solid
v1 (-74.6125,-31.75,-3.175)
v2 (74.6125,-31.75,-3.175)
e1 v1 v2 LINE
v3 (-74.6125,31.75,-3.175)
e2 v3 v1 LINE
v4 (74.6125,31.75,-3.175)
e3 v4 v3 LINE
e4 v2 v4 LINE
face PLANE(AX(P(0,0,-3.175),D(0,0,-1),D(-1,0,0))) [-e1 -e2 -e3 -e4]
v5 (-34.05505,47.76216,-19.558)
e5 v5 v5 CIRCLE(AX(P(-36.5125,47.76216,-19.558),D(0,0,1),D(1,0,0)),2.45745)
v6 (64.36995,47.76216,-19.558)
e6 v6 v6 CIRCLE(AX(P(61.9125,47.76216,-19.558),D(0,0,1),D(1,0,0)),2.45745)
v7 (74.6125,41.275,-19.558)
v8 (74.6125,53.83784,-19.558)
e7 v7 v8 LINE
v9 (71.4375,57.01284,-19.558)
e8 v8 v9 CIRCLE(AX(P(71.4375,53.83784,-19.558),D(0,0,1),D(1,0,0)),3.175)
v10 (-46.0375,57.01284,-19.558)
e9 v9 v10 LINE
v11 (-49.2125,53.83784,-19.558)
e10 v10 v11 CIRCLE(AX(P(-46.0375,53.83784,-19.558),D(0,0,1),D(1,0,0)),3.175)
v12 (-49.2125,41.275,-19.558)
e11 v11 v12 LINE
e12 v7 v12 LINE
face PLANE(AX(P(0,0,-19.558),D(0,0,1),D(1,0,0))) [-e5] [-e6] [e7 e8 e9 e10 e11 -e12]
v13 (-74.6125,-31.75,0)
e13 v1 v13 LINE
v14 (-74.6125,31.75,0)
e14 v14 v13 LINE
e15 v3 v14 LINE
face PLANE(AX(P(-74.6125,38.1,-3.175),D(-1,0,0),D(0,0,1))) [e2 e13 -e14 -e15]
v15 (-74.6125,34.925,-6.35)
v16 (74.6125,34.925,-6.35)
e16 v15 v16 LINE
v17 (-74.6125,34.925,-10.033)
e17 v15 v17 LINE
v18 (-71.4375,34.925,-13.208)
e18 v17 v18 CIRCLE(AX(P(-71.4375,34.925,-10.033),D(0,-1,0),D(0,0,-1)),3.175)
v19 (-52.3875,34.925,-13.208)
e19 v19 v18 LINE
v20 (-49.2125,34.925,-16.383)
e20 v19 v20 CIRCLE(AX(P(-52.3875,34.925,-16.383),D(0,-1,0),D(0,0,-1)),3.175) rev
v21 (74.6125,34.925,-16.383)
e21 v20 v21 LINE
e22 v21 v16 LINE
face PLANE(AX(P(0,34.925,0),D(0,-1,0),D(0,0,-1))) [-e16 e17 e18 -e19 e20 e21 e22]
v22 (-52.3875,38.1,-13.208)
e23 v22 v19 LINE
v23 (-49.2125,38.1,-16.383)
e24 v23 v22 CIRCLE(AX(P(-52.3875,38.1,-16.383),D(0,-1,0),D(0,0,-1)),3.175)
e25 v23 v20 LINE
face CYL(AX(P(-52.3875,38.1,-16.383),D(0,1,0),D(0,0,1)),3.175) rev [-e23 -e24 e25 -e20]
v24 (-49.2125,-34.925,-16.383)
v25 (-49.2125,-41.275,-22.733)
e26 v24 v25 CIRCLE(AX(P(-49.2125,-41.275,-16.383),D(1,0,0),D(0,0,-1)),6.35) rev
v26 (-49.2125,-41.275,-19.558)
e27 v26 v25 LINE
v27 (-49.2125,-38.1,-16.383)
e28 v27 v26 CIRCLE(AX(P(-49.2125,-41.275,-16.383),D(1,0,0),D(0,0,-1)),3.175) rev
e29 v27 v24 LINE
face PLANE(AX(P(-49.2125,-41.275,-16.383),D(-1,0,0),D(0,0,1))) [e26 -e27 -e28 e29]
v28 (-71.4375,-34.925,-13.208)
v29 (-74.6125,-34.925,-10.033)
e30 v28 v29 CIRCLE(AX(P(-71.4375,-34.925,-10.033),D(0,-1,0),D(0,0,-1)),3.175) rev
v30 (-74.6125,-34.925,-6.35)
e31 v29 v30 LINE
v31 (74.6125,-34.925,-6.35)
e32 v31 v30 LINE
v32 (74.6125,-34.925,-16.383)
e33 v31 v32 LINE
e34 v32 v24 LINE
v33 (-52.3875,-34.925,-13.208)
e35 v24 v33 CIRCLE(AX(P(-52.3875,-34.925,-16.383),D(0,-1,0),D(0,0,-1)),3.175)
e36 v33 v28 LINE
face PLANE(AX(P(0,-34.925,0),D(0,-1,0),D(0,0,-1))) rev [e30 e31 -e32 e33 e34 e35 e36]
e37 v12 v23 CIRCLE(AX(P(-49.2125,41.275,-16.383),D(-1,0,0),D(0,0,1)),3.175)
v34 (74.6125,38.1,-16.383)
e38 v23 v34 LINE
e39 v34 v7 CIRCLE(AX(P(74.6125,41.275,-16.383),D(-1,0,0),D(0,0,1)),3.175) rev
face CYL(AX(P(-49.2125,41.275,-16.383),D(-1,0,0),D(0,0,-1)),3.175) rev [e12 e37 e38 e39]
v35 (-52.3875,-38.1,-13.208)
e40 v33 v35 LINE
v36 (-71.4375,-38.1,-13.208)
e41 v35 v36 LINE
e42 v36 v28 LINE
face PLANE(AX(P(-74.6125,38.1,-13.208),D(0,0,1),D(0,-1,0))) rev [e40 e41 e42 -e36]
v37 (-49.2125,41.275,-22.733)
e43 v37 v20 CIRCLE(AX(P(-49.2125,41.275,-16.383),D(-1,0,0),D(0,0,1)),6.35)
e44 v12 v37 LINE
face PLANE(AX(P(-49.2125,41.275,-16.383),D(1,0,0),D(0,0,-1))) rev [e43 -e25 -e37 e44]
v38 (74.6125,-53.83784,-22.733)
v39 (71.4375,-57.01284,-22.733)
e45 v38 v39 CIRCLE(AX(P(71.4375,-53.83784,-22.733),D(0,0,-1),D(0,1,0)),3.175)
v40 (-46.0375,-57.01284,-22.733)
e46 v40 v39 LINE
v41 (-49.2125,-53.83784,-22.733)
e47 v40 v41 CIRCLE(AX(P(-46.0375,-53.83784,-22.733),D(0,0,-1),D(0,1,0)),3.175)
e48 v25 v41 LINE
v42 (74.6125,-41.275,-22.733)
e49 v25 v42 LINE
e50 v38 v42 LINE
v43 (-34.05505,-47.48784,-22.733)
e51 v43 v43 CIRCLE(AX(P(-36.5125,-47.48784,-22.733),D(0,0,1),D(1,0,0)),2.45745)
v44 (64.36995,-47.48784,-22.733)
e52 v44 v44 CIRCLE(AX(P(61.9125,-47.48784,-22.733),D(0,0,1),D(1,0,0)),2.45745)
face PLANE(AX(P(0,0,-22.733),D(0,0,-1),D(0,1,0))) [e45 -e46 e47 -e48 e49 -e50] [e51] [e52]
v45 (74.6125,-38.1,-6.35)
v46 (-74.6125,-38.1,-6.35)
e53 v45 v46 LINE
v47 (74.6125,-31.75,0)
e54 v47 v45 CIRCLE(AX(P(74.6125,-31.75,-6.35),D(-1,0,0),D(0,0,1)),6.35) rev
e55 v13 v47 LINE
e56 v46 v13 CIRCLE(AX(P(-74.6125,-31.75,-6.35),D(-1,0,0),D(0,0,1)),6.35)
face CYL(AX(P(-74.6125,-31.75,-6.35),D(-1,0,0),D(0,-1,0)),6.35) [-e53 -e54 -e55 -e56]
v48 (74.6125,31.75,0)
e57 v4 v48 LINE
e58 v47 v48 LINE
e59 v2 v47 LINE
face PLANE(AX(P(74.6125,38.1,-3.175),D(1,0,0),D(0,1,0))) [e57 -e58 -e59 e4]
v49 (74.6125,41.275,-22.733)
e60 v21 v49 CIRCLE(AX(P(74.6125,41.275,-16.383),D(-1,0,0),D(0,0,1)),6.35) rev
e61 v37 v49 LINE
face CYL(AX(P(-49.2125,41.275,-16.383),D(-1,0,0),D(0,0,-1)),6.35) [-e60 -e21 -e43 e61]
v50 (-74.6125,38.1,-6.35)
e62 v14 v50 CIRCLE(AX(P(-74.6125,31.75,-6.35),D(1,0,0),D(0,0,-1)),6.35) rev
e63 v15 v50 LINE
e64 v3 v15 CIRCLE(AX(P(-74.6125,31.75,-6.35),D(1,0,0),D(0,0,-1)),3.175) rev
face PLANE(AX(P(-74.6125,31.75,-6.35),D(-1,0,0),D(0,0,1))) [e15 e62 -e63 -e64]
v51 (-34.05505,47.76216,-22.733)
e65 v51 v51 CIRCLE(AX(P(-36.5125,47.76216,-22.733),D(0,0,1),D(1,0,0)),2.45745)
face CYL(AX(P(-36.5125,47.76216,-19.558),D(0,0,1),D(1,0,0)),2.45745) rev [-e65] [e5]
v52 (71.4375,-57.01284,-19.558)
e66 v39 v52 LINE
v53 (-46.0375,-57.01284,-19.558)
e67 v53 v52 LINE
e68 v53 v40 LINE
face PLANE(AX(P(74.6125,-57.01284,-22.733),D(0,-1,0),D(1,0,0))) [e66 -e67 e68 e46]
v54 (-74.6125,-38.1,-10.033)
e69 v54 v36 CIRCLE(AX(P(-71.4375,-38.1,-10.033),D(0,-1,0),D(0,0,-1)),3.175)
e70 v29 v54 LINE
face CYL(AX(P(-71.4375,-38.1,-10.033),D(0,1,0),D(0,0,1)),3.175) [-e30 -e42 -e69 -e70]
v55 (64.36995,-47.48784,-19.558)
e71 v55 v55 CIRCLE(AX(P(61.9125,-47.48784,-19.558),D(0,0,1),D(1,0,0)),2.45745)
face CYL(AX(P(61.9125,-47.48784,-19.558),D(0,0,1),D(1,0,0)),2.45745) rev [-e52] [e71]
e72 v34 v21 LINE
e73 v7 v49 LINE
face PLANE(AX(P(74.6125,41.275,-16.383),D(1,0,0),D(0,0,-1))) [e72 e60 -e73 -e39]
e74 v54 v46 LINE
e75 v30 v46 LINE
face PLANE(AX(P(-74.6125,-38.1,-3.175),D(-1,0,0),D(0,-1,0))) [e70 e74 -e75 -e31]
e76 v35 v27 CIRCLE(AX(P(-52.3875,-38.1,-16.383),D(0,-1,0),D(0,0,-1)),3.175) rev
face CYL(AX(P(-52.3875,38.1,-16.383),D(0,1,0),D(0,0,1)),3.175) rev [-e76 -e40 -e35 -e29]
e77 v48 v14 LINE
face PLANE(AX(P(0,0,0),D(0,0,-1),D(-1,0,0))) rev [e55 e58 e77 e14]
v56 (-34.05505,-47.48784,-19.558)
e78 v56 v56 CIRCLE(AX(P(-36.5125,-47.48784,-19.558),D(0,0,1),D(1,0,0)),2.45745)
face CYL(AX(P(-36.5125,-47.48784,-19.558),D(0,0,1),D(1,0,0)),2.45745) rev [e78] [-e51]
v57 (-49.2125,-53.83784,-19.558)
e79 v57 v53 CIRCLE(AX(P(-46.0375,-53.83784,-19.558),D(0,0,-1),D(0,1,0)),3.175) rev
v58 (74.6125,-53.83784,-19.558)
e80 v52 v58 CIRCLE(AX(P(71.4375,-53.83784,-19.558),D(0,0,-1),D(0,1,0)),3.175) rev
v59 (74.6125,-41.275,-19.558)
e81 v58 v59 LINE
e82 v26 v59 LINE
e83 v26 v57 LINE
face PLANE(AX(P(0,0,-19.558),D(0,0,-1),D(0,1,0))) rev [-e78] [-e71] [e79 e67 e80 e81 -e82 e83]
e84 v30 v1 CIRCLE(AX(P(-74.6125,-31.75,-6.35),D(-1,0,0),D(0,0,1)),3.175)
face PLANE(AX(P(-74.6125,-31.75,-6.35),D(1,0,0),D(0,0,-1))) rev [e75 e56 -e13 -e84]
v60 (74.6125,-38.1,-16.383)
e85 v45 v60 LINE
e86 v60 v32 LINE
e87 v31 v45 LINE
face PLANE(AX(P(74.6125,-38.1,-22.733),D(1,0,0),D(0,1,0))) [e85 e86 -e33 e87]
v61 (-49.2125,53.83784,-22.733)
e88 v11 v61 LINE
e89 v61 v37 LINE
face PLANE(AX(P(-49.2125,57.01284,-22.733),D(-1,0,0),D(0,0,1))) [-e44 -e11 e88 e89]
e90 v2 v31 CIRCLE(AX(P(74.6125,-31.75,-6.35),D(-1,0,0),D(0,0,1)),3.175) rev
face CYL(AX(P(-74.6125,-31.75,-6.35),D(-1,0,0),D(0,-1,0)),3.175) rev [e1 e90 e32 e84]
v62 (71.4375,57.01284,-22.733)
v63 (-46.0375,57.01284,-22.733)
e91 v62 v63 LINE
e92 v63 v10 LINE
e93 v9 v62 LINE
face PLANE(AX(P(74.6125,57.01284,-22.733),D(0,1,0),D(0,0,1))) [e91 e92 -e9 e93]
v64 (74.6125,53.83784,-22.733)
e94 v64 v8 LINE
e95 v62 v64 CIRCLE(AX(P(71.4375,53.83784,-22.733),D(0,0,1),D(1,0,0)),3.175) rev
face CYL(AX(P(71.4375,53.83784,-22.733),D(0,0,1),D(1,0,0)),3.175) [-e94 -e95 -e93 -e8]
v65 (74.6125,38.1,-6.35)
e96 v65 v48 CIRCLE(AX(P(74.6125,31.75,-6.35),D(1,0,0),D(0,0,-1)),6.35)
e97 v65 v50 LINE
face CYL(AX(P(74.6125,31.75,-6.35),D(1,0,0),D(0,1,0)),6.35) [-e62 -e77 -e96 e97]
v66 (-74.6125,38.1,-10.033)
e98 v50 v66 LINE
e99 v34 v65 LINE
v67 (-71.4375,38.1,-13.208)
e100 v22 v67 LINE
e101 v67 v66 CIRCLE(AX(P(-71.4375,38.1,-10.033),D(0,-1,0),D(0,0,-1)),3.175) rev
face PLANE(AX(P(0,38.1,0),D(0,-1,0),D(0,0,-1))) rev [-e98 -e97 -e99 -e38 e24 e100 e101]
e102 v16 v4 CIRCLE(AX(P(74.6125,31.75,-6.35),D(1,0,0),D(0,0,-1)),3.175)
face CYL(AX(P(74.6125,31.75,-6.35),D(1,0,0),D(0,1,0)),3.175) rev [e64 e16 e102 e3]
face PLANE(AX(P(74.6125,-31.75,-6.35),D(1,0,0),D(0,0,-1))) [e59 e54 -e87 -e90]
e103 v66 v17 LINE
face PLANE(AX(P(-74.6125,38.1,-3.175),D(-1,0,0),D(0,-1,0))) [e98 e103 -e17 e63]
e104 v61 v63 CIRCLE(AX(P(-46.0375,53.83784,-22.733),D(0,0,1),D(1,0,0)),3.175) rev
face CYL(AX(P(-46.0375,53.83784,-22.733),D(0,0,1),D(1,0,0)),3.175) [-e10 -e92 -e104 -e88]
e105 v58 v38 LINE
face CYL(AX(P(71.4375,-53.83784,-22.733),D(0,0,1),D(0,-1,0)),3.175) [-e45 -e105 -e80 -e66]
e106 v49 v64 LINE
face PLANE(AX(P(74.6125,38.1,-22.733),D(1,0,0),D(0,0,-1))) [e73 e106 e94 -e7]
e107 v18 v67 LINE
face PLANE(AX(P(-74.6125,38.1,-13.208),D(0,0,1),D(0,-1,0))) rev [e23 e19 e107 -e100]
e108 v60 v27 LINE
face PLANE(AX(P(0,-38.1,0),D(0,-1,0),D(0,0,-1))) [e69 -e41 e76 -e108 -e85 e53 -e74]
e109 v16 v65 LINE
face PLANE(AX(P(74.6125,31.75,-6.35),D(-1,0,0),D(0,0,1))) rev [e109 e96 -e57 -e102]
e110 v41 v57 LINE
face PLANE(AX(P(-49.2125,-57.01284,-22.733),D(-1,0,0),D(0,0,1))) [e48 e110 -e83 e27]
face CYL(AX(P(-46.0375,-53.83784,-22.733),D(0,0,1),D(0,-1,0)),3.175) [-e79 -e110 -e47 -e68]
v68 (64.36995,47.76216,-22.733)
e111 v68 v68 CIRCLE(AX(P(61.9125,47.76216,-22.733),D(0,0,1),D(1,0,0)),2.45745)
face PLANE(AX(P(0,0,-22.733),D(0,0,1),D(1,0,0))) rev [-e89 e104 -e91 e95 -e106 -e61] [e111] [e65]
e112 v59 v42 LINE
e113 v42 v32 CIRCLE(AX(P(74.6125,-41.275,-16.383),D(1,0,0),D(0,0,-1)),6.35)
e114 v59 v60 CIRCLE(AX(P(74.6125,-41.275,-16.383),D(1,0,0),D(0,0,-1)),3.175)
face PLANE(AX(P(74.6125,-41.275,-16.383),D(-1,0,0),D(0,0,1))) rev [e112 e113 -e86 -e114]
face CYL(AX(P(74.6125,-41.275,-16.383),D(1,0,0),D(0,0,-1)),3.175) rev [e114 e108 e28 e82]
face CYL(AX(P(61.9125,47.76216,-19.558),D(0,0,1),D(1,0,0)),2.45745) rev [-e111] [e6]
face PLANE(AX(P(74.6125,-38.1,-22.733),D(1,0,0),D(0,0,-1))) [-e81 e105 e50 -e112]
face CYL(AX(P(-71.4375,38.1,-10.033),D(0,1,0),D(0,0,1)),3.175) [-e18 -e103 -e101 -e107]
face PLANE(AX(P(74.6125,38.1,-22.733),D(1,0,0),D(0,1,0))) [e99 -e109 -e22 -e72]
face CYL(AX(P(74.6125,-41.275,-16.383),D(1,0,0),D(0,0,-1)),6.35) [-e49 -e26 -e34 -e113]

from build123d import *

# Parameters (mm, degrees)
SKETCH1_W                        = 149.225
SKETCH1_H                        = 76.2
BASE_FLANGE1_DEPTH               = 3.175
EDGE_FLANGE1_STRIP_W             = 19.05
EDGE_FLANGE1_STRIP_H             = 3.175
EDGE_FLANGE1_STRIP_CUT_DEPTH     = 149.225
EDGE_FLANGE1_STRIP_2_W           = 19.05
EDGE_FLANGE1_STRIP_2_H           = 3.175
EDGE_FLANGE1_STRIP_CUT_2_DEPTH   = 149.225
EDGE_FLANGE1_DEPTH               = 149.225
EDGE_FLANGE1_BEND_DEPTH          = 149.225
SKETCH17_W                       = 25.4
SKETCH17_H                       = 9.525
CUT_EXTRUDE1_DEPTH               = 110.04244332
EDGE_FLANGE2_STRIP_W             = 19.05
EDGE_FLANGE2_STRIP_H             = 3.175
EDGE_FLANGE2_STRIP_CUT_DEPTH     = 123.825
EDGE_FLANGE2_STRIP_2_W           = 19.05
EDGE_FLANGE2_STRIP_2_H           = 3.175
EDGE_FLANGE2_STRIP_CUT_2_DEPTH   = 123.825
EDGE_FLANGE2_DEPTH               = 123.825
EDGE_FLANGE2_BEND_DEPTH          = 123.825
SKETCH18_R                       = 2.3876
CUT_EXTRUDE2_DEPTH               = 97.614069214
LPATTERN1_COUNT                  = 2
LPATTERN1_PITCH                  = 98.425
LPATTERN1_COUNT_DIR2             = 2
LPATTERN1_PITCH_DIR2             = 95.25
FILLET1_R                        = 3.175
F_10_0_1935_DIAMETER_HOLE1_D     = 4.9149
F_10_0_1935_DIAMETER_HOLE1_DEPTH = 3.175


# Sheet-metal steps are written as plain solids
with BuildPart() as part:
    # Sketch1 → Base-Flange1 (new body)
    with BuildSketch(Plane.XY):
        Rectangle(SKETCH1_W, SKETCH1_H)
    extrude(amount=-BASE_FLANGE1_DEPTH)

    # Edge-Flange1 strip (across the edge) → Edge-Flange1 strip cut (cut)
    with BuildSketch(Plane(origin=(74.6125, -38.1, -3.175), x_dir=(0, 1, 0), z_dir=(-1, 0, 0))):
        with Locations((-3.175, -1.5875)):
            Rectangle(EDGE_FLANGE1_STRIP_W, EDGE_FLANGE1_STRIP_H)
    extrude(amount=EDGE_FLANGE1_STRIP_CUT_DEPTH, mode=Mode.SUBTRACT)

    # Edge-Flange1 strip 2 (across the edge) → Edge-Flange1 strip cut 2 (cut)
    with BuildSketch(Plane(origin=(-74.6125, 38.1, -3.175), x_dir=(0, -1, 0), z_dir=(1, 0, 0))):
        with Locations((-3.175, -1.5875)):
            Rectangle(EDGE_FLANGE1_STRIP_2_W, EDGE_FLANGE1_STRIP_2_H)
    extrude(amount=EDGE_FLANGE1_STRIP_CUT_2_DEPTH, mode=Mode.SUBTRACT)

    # Edge-Flange1 section (across the edge) → Edge-Flange1 (add)
    with BuildSketch(Plane(origin=(74.6125, -38.1, -3.175), x_dir=(0, 1, 0), z_dir=(-1, 0, 0))):
        with BuildLine():
            Line((0, 3.175), (0, 19.558))
            Line((0, 19.558), (3.175, 19.558))
            Line((3.175, 19.558), (3.175, 3.175))
            ThreePointArc((3.175, 3.175), (4.10493597, 0.92993597), (6.35, 0))
            Line((6.35, 0), (6.35, -3.175))
            ThreePointArc((6.35, -3.175), (1.859871939, -1.315128061), (0, 3.175))
        make_face()
    extrude(amount=EDGE_FLANGE1_DEPTH)

    # Edge-Flange1 section 2 (across the edge) → Edge-Flange1 bend (add)
    with BuildSketch(Plane(origin=(-74.6125, 38.1, -3.175), x_dir=(0, -1, 0), z_dir=(1, 0, 0))):
        with BuildLine():
            Line((0, 3.175), (0, 19.558))
            Line((0, 19.558), (3.175, 19.558))
            Line((3.175, 19.558), (3.175, 3.175))
            ThreePointArc((3.175, 3.175), (4.10493597, 0.92993597), (6.35, 0))
            Line((6.35, 0), (6.35, -3.175))
            ThreePointArc((6.35, -3.175), (1.859871939, -1.315128061), (0, 3.175))
        make_face()
    extrude(amount=EDGE_FLANGE1_BEND_DEPTH)

    # Sketch17 → Cut-Extrude1 (cut, through all)
    with BuildSketch(Plane.XZ.offset(38.1)):
        with Locations((-61.9125, -17.9705)):
            Rectangle(SKETCH17_W, SKETCH17_H)
    extrude(amount=-CUT_EXTRUDE1_DEPTH, mode=Mode.SUBTRACT)

    # Edge-Flange2 strip (across the edge) → Edge-Flange2 strip cut (cut)
    with BuildSketch(Plane(origin=(-49.2125, -38.1, -22.733), x_dir=(0, 0, 1), z_dir=(1, 0, 0))):
        with Locations((-3.175, -1.5875)):
            Rectangle(EDGE_FLANGE2_STRIP_W, EDGE_FLANGE2_STRIP_H)
    extrude(amount=EDGE_FLANGE2_STRIP_CUT_DEPTH, mode=Mode.SUBTRACT)

    # Edge-Flange2 strip 2 (across the edge) → Edge-Flange2 strip cut 2 (cut)
    with BuildSketch(Plane(origin=(74.6125, 38.1, -22.733), x_dir=(0, 0, 1), z_dir=(-1, 0, 0))):
        with Locations((-3.175, -1.5875)):
            Rectangle(EDGE_FLANGE2_STRIP_2_W, EDGE_FLANGE2_STRIP_2_H)
    extrude(amount=EDGE_FLANGE2_STRIP_CUT_2_DEPTH, mode=Mode.SUBTRACT)

    # Edge-Flange2 section (across the edge) → Edge-Flange2 (add)
    with BuildSketch(Plane(origin=(-49.2125, -38.1, -22.733), x_dir=(0, 0, 1), z_dir=(1, 0, 0))):
        with BuildLine():
            Line((0, 3.175), (0, 18.91284))
            Line((0, 18.91284), (3.175, 18.91284))
            Line((3.175, 18.91284), (3.175, 3.175))
            ThreePointArc((3.175, 3.175), (4.10493597, 0.92993597), (6.35, 0))
            Line((6.35, 0), (6.35, -3.175))
            ThreePointArc((6.35, -3.175), (1.859871939, -1.315128061), (0, 3.175))
        make_face()
    extrude(amount=EDGE_FLANGE2_DEPTH)

    # Edge-Flange2 section 2 (across the edge) → Edge-Flange2 bend (add)
    with BuildSketch(Plane(origin=(74.6125, 38.1, -22.733), x_dir=(0, 0, 1), z_dir=(-1, 0, 0))):
        with BuildLine():
            Line((0, 3.175), (0, 18.91284))
            Line((0, 18.91284), (3.175, 18.91284))
            Line((3.175, 18.91284), (3.175, 3.175))
            ThreePointArc((3.175, 3.175), (4.10493597, 0.92993597), (6.35, 0))
            Line((6.35, 0), (6.35, -3.175))
            ThreePointArc((6.35, -3.175), (1.859871939, -1.315128061), (0, 3.175))
        make_face()
    extrude(amount=EDGE_FLANGE2_BEND_DEPTH)

    # Sketch18 → Cut-Extrude2 (cut, through all)
    with BuildSketch(Plane(origin=(0, 0, -22.733), x_dir=(-1, 0, 0), z_dir=(0, 0, -1))):
        with Locations((-61.9125, -47.48784)):
            Circle(SKETCH18_R)
    cut_extrude2 = extrude(amount=-CUT_EXTRUDE2_DEPTH, mode=Mode.SUBTRACT)

    # LPattern1: Cut-Extrude2 2 × 2
    with Locations(*[(-i * LPATTERN1_PITCH, j * LPATTERN1_PITCH_DIR2, 0) for i in range(LPATTERN1_COUNT) for j in range(LPATTERN1_COUNT_DIR2) if (i, j) != (0, 0)]):
        add(cut_extrude2, mode=Mode.SUBTRACT)

    # Fillet1
    fillet1_edges = [part.edges().sort_by_distance(p)[0] for p in [
        (-49.2125, -36.5125, -13.208),
        (-49.2125, 36.5125, -13.208),
        (-74.6125, -36.5125, -13.208),
        (-74.6125, 36.5125, -13.208),
        (-49.2125, 57.01284, -21.1455),
        (74.6125, 57.01284, -21.1455),
        (74.6125, -57.01284, -21.1455),
        (-49.2125, -57.01284, -21.1455),
    ]]
    fillet(fillet1_edges, radius=FILLET1_R)

    # #10 (0.1935) Diameter Hole1
    with Locations(Plane.XY.offset(-19.558)):
        with Locations((-36.5125, 47.76216), (61.9125, 47.76216), (61.9125, -47.48784), (-36.5125, -47.48784)):
            Hole(F_10_0_1935_DIAMETER_HOLE1_D / 2, depth=F_10_0_1935_DIAMETER_HOLE1_DEPTH)


solid = part.part
